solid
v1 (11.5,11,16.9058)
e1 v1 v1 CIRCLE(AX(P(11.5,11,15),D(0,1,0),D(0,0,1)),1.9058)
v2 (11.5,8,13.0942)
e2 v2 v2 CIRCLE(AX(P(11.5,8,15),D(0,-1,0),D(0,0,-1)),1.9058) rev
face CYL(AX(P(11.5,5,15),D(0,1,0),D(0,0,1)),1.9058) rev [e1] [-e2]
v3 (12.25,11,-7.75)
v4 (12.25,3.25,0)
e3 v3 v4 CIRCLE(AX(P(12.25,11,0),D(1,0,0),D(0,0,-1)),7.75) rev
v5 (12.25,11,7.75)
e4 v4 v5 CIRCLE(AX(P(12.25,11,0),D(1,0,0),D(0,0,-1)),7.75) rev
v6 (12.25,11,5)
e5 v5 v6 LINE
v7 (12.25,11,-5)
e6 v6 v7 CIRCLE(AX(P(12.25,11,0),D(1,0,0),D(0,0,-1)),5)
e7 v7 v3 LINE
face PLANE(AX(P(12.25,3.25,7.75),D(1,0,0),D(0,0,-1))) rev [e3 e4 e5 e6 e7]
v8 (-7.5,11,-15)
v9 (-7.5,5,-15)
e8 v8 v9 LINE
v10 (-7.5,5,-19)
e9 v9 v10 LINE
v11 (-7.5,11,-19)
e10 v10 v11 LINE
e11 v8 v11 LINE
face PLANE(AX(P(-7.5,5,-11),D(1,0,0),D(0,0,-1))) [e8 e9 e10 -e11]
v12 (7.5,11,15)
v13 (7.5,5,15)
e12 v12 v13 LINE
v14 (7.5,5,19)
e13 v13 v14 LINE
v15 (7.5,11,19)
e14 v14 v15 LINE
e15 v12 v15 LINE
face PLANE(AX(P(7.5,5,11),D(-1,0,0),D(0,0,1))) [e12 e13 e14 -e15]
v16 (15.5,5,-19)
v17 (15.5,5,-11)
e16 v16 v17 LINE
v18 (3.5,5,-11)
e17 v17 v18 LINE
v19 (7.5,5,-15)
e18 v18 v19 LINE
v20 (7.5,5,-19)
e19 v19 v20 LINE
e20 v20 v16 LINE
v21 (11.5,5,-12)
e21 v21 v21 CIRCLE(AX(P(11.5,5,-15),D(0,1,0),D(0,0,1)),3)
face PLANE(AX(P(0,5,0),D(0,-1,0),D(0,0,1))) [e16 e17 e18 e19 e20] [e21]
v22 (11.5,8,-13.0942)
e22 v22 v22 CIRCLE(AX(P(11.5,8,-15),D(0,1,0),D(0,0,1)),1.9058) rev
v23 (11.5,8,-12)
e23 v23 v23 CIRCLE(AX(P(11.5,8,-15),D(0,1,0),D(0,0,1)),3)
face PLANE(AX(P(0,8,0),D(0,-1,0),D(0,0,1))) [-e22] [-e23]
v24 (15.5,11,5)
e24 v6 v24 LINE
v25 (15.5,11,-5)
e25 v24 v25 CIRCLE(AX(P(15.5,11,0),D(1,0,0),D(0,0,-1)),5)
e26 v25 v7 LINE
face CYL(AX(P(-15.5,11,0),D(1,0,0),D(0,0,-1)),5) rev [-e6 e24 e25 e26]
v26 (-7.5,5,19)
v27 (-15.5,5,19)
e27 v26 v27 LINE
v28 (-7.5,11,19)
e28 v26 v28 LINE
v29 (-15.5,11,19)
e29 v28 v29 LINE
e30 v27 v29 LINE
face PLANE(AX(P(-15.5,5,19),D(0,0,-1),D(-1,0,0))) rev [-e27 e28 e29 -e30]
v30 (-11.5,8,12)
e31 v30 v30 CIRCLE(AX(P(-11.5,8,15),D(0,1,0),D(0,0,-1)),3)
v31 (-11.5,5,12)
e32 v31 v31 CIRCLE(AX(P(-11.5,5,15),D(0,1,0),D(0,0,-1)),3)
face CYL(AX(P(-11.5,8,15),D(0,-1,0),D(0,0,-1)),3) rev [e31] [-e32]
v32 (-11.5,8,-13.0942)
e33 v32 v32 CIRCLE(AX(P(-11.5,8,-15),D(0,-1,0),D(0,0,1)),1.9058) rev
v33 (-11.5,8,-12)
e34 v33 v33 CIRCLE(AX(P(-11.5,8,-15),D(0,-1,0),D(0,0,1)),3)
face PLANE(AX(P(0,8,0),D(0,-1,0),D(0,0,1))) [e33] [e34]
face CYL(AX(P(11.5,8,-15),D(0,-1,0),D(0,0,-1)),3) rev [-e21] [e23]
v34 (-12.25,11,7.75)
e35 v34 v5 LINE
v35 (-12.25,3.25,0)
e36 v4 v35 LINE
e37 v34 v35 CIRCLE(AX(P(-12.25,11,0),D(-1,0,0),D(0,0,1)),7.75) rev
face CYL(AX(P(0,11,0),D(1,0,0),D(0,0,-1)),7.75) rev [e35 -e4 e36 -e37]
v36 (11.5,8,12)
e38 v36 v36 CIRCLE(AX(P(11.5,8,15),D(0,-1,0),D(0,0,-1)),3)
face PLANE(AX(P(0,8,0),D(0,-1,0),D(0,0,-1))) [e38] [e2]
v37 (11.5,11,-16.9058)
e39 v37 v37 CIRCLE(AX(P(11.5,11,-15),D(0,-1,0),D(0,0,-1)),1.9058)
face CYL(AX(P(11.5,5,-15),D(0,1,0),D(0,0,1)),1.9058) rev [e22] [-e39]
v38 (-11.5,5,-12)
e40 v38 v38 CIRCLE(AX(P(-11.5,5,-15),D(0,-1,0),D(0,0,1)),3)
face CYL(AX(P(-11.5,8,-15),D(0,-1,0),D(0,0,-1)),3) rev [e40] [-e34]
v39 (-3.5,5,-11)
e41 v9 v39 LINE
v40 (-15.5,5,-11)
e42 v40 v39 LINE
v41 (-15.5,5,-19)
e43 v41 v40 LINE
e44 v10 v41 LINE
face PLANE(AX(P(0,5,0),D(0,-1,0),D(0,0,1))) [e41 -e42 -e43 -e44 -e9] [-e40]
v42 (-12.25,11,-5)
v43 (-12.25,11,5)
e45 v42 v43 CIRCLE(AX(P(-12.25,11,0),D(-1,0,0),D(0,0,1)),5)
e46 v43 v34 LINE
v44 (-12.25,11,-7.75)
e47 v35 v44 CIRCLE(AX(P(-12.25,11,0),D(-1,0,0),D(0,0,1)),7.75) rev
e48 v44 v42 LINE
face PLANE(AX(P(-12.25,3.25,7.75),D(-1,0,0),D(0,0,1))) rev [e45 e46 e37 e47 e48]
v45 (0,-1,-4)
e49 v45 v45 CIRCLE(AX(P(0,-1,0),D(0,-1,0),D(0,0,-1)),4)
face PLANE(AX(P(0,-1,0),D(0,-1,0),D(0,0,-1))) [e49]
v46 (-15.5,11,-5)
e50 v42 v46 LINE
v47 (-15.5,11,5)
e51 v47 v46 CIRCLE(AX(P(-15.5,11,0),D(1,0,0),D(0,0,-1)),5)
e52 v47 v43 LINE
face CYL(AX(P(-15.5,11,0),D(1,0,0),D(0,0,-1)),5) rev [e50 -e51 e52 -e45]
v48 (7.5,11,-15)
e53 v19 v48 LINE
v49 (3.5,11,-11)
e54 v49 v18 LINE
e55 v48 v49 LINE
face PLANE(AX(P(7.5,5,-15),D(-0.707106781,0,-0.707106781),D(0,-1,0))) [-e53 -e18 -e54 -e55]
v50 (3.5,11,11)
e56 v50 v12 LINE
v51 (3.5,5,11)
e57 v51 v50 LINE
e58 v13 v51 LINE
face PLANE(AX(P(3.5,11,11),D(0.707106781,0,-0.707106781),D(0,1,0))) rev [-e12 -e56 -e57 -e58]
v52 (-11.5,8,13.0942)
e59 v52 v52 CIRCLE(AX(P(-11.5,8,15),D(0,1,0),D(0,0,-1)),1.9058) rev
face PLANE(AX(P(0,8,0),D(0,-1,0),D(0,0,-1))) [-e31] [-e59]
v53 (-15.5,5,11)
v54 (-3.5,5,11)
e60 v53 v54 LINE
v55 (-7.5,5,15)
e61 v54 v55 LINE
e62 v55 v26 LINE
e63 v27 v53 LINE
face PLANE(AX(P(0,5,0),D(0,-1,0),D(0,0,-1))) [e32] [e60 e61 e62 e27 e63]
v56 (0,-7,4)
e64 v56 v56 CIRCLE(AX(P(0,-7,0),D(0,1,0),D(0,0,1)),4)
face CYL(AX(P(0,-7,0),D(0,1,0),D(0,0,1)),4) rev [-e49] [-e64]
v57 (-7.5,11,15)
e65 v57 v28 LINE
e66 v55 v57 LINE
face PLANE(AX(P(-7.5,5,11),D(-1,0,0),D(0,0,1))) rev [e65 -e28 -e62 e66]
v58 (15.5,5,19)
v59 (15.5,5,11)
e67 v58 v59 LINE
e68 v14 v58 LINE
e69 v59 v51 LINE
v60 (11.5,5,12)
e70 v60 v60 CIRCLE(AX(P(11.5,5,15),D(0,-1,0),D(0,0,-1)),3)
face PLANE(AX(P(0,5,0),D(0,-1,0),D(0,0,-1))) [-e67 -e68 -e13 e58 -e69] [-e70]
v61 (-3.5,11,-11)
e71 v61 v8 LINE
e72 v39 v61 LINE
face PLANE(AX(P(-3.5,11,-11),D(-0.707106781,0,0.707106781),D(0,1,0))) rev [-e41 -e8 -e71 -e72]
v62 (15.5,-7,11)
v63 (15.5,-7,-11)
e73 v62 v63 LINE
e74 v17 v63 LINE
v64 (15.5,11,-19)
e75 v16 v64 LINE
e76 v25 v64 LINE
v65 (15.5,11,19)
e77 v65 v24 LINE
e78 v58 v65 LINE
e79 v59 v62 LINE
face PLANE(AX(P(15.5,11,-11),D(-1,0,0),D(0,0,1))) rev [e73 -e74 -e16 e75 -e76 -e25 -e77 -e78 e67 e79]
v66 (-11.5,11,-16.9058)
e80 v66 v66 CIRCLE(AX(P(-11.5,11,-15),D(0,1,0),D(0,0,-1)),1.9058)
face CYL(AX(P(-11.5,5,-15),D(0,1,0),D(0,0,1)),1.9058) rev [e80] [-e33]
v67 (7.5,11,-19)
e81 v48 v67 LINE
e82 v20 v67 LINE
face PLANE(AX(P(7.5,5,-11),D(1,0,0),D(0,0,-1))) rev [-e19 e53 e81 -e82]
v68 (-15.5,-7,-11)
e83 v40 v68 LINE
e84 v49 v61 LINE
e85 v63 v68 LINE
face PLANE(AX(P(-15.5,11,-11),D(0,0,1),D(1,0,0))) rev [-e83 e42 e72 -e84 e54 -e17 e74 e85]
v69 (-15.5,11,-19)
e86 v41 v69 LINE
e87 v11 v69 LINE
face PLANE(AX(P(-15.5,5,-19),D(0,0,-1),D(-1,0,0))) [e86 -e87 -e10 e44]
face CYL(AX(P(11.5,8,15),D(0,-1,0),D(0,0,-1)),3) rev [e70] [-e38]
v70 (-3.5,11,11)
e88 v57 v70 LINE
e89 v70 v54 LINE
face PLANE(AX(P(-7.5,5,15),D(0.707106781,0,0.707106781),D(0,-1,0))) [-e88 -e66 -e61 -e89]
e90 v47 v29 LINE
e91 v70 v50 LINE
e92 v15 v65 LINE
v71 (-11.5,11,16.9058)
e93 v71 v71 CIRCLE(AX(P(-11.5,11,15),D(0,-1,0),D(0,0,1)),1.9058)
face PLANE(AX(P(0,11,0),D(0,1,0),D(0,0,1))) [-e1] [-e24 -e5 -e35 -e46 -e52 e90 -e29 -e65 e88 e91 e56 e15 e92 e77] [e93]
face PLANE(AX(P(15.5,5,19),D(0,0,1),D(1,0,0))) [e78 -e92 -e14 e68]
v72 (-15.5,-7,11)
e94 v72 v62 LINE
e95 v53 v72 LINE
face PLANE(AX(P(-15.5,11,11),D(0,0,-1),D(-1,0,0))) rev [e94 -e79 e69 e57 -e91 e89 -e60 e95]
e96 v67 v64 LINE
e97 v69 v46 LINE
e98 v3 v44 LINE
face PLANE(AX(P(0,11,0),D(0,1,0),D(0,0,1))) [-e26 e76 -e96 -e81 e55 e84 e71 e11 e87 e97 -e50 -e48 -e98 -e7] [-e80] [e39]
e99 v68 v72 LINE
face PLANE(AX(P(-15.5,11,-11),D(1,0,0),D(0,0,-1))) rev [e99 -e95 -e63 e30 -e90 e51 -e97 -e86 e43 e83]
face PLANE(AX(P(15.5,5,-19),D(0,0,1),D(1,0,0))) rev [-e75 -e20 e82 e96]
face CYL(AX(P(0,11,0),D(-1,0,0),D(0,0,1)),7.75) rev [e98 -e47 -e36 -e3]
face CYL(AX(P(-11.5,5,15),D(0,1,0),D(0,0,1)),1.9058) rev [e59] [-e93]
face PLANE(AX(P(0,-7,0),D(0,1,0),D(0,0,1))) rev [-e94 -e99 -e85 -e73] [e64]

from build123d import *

# Parameters (mm, degrees)
SKETCH1_W                 = 31
SKETCH1_H                 = 22
BOSS_EXTRUDE1_DEPTH       = 11
SKETCH2_W                 = 31
SKETCH2_H                 = 22
SKETCH2_R                 = 4
BOSS_EXTRUDE2_DEPTH       = 7
SKETCH3_W                 = 24.5
SKETCH3_H                 = 15.5
CUT_EXTRUDE1_DEPTH        = 7.75
FILLET1_R                 = 7.75
CUT_EXTRUDE2_DEPTH        = 32.812929761
CUT_EXTRUDE2_DEPTH_BACK   = 32.812929761
SKETCH4_R                 = 5
SKETCH5_W                 = 8
SKETCH5_H                 = 8
SKETCH5_R                 = 1.905800151
BOSS_EXTRUDE3_DEPTH       = 6
CUT_EXTRUDE3_START        = -3
SKETCH6_R                 = 3
SKETCH6_R_2               = 1.905800151
CUT_EXTRUDE3_DEPTH        = 3
MIRROR9_COPY_1_SKETCH_W   = 8
MIRROR9_COPY_1_SKETCH_H   = 8
MIRROR9_COPY_1_SKETCH_R   = 1.905800151
MIRROR9_COPY_1_DEPTH      = 6
MIRROR9_START             = -3
MIRROR9_COPY_2_SKETCH_R   = 3
MIRROR9_COPY_2_SKETCH_R_2 = 1.905800151
MIRROR9_COPY_2_DEPTH      = 3
CHAMFER2_SIZE             = 4
SKETCH7_R                 = 4
BOSS_EXTRUDE4_DEPTH       = 1


with BuildPart() as part:
    # Sketch1 → Boss-Extrude1 (new body)
    with BuildSketch(Plane(origin=(0, 0, 0), x_dir=(1, 0, 0), z_dir=(0, 1, 0))):
        Rectangle(SKETCH1_W, SKETCH1_H)
    extrude(amount=BOSS_EXTRUDE1_DEPTH)

    # Sketch2 → Boss-Extrude2 (add)
    with BuildSketch(Plane(origin=(0, 0, 0), x_dir=(1, 0, 0), z_dir=(0, 1, 0))):
        Rectangle(SKETCH2_W, SKETCH2_H)
        with Locations(Location((0, 0, 0), (0, 0, 270))):
            Circle(SKETCH2_R, mode=Mode.SUBTRACT)
    extrude(amount=-BOSS_EXTRUDE2_DEPTH)

    # Sketch3 → Cut-Extrude1 (cut)
    with BuildSketch(Plane(origin=(0, 11, 0), x_dir=(1, 0, 0), z_dir=(0, 1, 0))):
        Rectangle(SKETCH3_W, SKETCH3_H)
    extrude(amount=-CUT_EXTRUDE1_DEPTH, mode=Mode.SUBTRACT)

    # Fillet1
    fillet1_edges = [part.edges().sort_by_distance(p)[0] for p in [
        (0, 3.25, 7.75),
        (0, 3.25, -7.75),
    ]]
    fillet(fillet1_edges, radius=FILLET1_R - 0.0001)  # a hair under: the kernel refuses the full size

    # Sketch4 → Cut-Extrude2 (cut, two sides: drawn at the far end of the back side and taken through both)
    with BuildSketch(Plane(origin=(-12.25, 0, 0), x_dir=(0, 0, -1), z_dir=(1, 0, 0)).offset(-CUT_EXTRUDE2_DEPTH_BACK)):
        with Locations((0, 11)):
            Circle(SKETCH4_R)
    extrude(amount=CUT_EXTRUDE2_DEPTH + CUT_EXTRUDE2_DEPTH_BACK, mode=Mode.SUBTRACT)

    # Sketch5 → Boss-Extrude3 (add)
    with BuildSketch(Plane(origin=(0, 11, 0), x_dir=(1, 0, 0), z_dir=(0, 1, 0))):
        with Locations((11.5, -15)):
            Rectangle(SKETCH5_W, SKETCH5_H)
        with Locations(Location((11.5, -15, 0), (0, 0, 270))):
            Circle(SKETCH5_R, mode=Mode.SUBTRACT)
    boss_extrude3 = extrude(amount=-BOSS_EXTRUDE3_DEPTH)

    # Sketch6 → Cut-Extrude3 (cut)
    with BuildSketch(Plane.XZ.offset(-5).offset(CUT_EXTRUDE3_START)):
        with Locations(Location((11.5, 15, 0), (0, 0, 270))):
            Circle(SKETCH6_R)
        with Locations(Location((11.5, 15, 0), (0, 0, 90))):
            Circle(SKETCH6_R_2, mode=Mode.SUBTRACT)
    cut_extrude3 = extrude(amount=CUT_EXTRUDE3_DEPTH, mode=Mode.SUBTRACT)

    # Mirror8: Boss-Extrude3, Cut-Extrude3 across plane
    add(boss_extrude3.mirror(Plane(origin=(0, 0, 0), x_dir=(0, 0, 1), z_dir=(1, 0, 0))))
    add(cut_extrude3.mirror(Plane(origin=(0, 0, 0), x_dir=(0, 0, 1), z_dir=(1, 0, 0))), mode=Mode.SUBTRACT)

    # Mirror9: Boss-Extrude3, Cut-Extrude3 across plane
    add(boss_extrude3.mirror(Plane.XY))
    add(cut_extrude3.mirror(Plane.XY), mode=Mode.SUBTRACT)

    # Mirror9 copy 1 sketch → Mirror9 copy 1 (add)
    with BuildSketch(Plane(origin=(0, 11, 0), x_dir=(-1, 0, 0), z_dir=(0, 1, 0))):
        with Locations((11.5, -15)):
            Rectangle(MIRROR9_COPY_1_SKETCH_W, MIRROR9_COPY_1_SKETCH_H)
        with Locations(Location((11.5, -15, 0), (0, 0, 270))):
            Circle(MIRROR9_COPY_1_SKETCH_R, mode=Mode.SUBTRACT)
    extrude(amount=-MIRROR9_COPY_1_DEPTH)

    # Mirror9 copy 2 sketch → Mirror9 copy 2 (cut)
    with BuildSketch(Plane(origin=(0, 5, 0), x_dir=(-1, 0, 0), z_dir=(0, -1, 0)).offset(MIRROR9_START)):
        with Locations(Location((11.5, 15, 0), (0, 0, 270))):
            Circle(MIRROR9_COPY_2_SKETCH_R)
        with Locations(Location((11.5, 15, 0), (0, 0, 90))):
            Circle(MIRROR9_COPY_2_SKETCH_R_2, mode=Mode.SUBTRACT)
    extrude(amount=MIRROR9_COPY_2_DEPTH, mode=Mode.SUBTRACT)

    # Chamfer2
    chamfer2_edges = [part.edges().sort_by_distance(p)[0] for p in [
        (-7.5, 8, -11),
        (7.5, 8, -11),
        (7.5, 8, 11),
        (-7.5, 8, 11),
    ]]
    chamfer(chamfer2_edges, length=CHAMFER2_SIZE)

    # Sketch7 → Boss-Extrude4 (add)
    with BuildSketch(Plane.XZ):
        with Locations(Location((0, 0, 0), (0, 0, 90))):
            Circle(SKETCH7_R)
    extrude(amount=BOSS_EXTRUDE4_DEPTH)


solid = part.part
